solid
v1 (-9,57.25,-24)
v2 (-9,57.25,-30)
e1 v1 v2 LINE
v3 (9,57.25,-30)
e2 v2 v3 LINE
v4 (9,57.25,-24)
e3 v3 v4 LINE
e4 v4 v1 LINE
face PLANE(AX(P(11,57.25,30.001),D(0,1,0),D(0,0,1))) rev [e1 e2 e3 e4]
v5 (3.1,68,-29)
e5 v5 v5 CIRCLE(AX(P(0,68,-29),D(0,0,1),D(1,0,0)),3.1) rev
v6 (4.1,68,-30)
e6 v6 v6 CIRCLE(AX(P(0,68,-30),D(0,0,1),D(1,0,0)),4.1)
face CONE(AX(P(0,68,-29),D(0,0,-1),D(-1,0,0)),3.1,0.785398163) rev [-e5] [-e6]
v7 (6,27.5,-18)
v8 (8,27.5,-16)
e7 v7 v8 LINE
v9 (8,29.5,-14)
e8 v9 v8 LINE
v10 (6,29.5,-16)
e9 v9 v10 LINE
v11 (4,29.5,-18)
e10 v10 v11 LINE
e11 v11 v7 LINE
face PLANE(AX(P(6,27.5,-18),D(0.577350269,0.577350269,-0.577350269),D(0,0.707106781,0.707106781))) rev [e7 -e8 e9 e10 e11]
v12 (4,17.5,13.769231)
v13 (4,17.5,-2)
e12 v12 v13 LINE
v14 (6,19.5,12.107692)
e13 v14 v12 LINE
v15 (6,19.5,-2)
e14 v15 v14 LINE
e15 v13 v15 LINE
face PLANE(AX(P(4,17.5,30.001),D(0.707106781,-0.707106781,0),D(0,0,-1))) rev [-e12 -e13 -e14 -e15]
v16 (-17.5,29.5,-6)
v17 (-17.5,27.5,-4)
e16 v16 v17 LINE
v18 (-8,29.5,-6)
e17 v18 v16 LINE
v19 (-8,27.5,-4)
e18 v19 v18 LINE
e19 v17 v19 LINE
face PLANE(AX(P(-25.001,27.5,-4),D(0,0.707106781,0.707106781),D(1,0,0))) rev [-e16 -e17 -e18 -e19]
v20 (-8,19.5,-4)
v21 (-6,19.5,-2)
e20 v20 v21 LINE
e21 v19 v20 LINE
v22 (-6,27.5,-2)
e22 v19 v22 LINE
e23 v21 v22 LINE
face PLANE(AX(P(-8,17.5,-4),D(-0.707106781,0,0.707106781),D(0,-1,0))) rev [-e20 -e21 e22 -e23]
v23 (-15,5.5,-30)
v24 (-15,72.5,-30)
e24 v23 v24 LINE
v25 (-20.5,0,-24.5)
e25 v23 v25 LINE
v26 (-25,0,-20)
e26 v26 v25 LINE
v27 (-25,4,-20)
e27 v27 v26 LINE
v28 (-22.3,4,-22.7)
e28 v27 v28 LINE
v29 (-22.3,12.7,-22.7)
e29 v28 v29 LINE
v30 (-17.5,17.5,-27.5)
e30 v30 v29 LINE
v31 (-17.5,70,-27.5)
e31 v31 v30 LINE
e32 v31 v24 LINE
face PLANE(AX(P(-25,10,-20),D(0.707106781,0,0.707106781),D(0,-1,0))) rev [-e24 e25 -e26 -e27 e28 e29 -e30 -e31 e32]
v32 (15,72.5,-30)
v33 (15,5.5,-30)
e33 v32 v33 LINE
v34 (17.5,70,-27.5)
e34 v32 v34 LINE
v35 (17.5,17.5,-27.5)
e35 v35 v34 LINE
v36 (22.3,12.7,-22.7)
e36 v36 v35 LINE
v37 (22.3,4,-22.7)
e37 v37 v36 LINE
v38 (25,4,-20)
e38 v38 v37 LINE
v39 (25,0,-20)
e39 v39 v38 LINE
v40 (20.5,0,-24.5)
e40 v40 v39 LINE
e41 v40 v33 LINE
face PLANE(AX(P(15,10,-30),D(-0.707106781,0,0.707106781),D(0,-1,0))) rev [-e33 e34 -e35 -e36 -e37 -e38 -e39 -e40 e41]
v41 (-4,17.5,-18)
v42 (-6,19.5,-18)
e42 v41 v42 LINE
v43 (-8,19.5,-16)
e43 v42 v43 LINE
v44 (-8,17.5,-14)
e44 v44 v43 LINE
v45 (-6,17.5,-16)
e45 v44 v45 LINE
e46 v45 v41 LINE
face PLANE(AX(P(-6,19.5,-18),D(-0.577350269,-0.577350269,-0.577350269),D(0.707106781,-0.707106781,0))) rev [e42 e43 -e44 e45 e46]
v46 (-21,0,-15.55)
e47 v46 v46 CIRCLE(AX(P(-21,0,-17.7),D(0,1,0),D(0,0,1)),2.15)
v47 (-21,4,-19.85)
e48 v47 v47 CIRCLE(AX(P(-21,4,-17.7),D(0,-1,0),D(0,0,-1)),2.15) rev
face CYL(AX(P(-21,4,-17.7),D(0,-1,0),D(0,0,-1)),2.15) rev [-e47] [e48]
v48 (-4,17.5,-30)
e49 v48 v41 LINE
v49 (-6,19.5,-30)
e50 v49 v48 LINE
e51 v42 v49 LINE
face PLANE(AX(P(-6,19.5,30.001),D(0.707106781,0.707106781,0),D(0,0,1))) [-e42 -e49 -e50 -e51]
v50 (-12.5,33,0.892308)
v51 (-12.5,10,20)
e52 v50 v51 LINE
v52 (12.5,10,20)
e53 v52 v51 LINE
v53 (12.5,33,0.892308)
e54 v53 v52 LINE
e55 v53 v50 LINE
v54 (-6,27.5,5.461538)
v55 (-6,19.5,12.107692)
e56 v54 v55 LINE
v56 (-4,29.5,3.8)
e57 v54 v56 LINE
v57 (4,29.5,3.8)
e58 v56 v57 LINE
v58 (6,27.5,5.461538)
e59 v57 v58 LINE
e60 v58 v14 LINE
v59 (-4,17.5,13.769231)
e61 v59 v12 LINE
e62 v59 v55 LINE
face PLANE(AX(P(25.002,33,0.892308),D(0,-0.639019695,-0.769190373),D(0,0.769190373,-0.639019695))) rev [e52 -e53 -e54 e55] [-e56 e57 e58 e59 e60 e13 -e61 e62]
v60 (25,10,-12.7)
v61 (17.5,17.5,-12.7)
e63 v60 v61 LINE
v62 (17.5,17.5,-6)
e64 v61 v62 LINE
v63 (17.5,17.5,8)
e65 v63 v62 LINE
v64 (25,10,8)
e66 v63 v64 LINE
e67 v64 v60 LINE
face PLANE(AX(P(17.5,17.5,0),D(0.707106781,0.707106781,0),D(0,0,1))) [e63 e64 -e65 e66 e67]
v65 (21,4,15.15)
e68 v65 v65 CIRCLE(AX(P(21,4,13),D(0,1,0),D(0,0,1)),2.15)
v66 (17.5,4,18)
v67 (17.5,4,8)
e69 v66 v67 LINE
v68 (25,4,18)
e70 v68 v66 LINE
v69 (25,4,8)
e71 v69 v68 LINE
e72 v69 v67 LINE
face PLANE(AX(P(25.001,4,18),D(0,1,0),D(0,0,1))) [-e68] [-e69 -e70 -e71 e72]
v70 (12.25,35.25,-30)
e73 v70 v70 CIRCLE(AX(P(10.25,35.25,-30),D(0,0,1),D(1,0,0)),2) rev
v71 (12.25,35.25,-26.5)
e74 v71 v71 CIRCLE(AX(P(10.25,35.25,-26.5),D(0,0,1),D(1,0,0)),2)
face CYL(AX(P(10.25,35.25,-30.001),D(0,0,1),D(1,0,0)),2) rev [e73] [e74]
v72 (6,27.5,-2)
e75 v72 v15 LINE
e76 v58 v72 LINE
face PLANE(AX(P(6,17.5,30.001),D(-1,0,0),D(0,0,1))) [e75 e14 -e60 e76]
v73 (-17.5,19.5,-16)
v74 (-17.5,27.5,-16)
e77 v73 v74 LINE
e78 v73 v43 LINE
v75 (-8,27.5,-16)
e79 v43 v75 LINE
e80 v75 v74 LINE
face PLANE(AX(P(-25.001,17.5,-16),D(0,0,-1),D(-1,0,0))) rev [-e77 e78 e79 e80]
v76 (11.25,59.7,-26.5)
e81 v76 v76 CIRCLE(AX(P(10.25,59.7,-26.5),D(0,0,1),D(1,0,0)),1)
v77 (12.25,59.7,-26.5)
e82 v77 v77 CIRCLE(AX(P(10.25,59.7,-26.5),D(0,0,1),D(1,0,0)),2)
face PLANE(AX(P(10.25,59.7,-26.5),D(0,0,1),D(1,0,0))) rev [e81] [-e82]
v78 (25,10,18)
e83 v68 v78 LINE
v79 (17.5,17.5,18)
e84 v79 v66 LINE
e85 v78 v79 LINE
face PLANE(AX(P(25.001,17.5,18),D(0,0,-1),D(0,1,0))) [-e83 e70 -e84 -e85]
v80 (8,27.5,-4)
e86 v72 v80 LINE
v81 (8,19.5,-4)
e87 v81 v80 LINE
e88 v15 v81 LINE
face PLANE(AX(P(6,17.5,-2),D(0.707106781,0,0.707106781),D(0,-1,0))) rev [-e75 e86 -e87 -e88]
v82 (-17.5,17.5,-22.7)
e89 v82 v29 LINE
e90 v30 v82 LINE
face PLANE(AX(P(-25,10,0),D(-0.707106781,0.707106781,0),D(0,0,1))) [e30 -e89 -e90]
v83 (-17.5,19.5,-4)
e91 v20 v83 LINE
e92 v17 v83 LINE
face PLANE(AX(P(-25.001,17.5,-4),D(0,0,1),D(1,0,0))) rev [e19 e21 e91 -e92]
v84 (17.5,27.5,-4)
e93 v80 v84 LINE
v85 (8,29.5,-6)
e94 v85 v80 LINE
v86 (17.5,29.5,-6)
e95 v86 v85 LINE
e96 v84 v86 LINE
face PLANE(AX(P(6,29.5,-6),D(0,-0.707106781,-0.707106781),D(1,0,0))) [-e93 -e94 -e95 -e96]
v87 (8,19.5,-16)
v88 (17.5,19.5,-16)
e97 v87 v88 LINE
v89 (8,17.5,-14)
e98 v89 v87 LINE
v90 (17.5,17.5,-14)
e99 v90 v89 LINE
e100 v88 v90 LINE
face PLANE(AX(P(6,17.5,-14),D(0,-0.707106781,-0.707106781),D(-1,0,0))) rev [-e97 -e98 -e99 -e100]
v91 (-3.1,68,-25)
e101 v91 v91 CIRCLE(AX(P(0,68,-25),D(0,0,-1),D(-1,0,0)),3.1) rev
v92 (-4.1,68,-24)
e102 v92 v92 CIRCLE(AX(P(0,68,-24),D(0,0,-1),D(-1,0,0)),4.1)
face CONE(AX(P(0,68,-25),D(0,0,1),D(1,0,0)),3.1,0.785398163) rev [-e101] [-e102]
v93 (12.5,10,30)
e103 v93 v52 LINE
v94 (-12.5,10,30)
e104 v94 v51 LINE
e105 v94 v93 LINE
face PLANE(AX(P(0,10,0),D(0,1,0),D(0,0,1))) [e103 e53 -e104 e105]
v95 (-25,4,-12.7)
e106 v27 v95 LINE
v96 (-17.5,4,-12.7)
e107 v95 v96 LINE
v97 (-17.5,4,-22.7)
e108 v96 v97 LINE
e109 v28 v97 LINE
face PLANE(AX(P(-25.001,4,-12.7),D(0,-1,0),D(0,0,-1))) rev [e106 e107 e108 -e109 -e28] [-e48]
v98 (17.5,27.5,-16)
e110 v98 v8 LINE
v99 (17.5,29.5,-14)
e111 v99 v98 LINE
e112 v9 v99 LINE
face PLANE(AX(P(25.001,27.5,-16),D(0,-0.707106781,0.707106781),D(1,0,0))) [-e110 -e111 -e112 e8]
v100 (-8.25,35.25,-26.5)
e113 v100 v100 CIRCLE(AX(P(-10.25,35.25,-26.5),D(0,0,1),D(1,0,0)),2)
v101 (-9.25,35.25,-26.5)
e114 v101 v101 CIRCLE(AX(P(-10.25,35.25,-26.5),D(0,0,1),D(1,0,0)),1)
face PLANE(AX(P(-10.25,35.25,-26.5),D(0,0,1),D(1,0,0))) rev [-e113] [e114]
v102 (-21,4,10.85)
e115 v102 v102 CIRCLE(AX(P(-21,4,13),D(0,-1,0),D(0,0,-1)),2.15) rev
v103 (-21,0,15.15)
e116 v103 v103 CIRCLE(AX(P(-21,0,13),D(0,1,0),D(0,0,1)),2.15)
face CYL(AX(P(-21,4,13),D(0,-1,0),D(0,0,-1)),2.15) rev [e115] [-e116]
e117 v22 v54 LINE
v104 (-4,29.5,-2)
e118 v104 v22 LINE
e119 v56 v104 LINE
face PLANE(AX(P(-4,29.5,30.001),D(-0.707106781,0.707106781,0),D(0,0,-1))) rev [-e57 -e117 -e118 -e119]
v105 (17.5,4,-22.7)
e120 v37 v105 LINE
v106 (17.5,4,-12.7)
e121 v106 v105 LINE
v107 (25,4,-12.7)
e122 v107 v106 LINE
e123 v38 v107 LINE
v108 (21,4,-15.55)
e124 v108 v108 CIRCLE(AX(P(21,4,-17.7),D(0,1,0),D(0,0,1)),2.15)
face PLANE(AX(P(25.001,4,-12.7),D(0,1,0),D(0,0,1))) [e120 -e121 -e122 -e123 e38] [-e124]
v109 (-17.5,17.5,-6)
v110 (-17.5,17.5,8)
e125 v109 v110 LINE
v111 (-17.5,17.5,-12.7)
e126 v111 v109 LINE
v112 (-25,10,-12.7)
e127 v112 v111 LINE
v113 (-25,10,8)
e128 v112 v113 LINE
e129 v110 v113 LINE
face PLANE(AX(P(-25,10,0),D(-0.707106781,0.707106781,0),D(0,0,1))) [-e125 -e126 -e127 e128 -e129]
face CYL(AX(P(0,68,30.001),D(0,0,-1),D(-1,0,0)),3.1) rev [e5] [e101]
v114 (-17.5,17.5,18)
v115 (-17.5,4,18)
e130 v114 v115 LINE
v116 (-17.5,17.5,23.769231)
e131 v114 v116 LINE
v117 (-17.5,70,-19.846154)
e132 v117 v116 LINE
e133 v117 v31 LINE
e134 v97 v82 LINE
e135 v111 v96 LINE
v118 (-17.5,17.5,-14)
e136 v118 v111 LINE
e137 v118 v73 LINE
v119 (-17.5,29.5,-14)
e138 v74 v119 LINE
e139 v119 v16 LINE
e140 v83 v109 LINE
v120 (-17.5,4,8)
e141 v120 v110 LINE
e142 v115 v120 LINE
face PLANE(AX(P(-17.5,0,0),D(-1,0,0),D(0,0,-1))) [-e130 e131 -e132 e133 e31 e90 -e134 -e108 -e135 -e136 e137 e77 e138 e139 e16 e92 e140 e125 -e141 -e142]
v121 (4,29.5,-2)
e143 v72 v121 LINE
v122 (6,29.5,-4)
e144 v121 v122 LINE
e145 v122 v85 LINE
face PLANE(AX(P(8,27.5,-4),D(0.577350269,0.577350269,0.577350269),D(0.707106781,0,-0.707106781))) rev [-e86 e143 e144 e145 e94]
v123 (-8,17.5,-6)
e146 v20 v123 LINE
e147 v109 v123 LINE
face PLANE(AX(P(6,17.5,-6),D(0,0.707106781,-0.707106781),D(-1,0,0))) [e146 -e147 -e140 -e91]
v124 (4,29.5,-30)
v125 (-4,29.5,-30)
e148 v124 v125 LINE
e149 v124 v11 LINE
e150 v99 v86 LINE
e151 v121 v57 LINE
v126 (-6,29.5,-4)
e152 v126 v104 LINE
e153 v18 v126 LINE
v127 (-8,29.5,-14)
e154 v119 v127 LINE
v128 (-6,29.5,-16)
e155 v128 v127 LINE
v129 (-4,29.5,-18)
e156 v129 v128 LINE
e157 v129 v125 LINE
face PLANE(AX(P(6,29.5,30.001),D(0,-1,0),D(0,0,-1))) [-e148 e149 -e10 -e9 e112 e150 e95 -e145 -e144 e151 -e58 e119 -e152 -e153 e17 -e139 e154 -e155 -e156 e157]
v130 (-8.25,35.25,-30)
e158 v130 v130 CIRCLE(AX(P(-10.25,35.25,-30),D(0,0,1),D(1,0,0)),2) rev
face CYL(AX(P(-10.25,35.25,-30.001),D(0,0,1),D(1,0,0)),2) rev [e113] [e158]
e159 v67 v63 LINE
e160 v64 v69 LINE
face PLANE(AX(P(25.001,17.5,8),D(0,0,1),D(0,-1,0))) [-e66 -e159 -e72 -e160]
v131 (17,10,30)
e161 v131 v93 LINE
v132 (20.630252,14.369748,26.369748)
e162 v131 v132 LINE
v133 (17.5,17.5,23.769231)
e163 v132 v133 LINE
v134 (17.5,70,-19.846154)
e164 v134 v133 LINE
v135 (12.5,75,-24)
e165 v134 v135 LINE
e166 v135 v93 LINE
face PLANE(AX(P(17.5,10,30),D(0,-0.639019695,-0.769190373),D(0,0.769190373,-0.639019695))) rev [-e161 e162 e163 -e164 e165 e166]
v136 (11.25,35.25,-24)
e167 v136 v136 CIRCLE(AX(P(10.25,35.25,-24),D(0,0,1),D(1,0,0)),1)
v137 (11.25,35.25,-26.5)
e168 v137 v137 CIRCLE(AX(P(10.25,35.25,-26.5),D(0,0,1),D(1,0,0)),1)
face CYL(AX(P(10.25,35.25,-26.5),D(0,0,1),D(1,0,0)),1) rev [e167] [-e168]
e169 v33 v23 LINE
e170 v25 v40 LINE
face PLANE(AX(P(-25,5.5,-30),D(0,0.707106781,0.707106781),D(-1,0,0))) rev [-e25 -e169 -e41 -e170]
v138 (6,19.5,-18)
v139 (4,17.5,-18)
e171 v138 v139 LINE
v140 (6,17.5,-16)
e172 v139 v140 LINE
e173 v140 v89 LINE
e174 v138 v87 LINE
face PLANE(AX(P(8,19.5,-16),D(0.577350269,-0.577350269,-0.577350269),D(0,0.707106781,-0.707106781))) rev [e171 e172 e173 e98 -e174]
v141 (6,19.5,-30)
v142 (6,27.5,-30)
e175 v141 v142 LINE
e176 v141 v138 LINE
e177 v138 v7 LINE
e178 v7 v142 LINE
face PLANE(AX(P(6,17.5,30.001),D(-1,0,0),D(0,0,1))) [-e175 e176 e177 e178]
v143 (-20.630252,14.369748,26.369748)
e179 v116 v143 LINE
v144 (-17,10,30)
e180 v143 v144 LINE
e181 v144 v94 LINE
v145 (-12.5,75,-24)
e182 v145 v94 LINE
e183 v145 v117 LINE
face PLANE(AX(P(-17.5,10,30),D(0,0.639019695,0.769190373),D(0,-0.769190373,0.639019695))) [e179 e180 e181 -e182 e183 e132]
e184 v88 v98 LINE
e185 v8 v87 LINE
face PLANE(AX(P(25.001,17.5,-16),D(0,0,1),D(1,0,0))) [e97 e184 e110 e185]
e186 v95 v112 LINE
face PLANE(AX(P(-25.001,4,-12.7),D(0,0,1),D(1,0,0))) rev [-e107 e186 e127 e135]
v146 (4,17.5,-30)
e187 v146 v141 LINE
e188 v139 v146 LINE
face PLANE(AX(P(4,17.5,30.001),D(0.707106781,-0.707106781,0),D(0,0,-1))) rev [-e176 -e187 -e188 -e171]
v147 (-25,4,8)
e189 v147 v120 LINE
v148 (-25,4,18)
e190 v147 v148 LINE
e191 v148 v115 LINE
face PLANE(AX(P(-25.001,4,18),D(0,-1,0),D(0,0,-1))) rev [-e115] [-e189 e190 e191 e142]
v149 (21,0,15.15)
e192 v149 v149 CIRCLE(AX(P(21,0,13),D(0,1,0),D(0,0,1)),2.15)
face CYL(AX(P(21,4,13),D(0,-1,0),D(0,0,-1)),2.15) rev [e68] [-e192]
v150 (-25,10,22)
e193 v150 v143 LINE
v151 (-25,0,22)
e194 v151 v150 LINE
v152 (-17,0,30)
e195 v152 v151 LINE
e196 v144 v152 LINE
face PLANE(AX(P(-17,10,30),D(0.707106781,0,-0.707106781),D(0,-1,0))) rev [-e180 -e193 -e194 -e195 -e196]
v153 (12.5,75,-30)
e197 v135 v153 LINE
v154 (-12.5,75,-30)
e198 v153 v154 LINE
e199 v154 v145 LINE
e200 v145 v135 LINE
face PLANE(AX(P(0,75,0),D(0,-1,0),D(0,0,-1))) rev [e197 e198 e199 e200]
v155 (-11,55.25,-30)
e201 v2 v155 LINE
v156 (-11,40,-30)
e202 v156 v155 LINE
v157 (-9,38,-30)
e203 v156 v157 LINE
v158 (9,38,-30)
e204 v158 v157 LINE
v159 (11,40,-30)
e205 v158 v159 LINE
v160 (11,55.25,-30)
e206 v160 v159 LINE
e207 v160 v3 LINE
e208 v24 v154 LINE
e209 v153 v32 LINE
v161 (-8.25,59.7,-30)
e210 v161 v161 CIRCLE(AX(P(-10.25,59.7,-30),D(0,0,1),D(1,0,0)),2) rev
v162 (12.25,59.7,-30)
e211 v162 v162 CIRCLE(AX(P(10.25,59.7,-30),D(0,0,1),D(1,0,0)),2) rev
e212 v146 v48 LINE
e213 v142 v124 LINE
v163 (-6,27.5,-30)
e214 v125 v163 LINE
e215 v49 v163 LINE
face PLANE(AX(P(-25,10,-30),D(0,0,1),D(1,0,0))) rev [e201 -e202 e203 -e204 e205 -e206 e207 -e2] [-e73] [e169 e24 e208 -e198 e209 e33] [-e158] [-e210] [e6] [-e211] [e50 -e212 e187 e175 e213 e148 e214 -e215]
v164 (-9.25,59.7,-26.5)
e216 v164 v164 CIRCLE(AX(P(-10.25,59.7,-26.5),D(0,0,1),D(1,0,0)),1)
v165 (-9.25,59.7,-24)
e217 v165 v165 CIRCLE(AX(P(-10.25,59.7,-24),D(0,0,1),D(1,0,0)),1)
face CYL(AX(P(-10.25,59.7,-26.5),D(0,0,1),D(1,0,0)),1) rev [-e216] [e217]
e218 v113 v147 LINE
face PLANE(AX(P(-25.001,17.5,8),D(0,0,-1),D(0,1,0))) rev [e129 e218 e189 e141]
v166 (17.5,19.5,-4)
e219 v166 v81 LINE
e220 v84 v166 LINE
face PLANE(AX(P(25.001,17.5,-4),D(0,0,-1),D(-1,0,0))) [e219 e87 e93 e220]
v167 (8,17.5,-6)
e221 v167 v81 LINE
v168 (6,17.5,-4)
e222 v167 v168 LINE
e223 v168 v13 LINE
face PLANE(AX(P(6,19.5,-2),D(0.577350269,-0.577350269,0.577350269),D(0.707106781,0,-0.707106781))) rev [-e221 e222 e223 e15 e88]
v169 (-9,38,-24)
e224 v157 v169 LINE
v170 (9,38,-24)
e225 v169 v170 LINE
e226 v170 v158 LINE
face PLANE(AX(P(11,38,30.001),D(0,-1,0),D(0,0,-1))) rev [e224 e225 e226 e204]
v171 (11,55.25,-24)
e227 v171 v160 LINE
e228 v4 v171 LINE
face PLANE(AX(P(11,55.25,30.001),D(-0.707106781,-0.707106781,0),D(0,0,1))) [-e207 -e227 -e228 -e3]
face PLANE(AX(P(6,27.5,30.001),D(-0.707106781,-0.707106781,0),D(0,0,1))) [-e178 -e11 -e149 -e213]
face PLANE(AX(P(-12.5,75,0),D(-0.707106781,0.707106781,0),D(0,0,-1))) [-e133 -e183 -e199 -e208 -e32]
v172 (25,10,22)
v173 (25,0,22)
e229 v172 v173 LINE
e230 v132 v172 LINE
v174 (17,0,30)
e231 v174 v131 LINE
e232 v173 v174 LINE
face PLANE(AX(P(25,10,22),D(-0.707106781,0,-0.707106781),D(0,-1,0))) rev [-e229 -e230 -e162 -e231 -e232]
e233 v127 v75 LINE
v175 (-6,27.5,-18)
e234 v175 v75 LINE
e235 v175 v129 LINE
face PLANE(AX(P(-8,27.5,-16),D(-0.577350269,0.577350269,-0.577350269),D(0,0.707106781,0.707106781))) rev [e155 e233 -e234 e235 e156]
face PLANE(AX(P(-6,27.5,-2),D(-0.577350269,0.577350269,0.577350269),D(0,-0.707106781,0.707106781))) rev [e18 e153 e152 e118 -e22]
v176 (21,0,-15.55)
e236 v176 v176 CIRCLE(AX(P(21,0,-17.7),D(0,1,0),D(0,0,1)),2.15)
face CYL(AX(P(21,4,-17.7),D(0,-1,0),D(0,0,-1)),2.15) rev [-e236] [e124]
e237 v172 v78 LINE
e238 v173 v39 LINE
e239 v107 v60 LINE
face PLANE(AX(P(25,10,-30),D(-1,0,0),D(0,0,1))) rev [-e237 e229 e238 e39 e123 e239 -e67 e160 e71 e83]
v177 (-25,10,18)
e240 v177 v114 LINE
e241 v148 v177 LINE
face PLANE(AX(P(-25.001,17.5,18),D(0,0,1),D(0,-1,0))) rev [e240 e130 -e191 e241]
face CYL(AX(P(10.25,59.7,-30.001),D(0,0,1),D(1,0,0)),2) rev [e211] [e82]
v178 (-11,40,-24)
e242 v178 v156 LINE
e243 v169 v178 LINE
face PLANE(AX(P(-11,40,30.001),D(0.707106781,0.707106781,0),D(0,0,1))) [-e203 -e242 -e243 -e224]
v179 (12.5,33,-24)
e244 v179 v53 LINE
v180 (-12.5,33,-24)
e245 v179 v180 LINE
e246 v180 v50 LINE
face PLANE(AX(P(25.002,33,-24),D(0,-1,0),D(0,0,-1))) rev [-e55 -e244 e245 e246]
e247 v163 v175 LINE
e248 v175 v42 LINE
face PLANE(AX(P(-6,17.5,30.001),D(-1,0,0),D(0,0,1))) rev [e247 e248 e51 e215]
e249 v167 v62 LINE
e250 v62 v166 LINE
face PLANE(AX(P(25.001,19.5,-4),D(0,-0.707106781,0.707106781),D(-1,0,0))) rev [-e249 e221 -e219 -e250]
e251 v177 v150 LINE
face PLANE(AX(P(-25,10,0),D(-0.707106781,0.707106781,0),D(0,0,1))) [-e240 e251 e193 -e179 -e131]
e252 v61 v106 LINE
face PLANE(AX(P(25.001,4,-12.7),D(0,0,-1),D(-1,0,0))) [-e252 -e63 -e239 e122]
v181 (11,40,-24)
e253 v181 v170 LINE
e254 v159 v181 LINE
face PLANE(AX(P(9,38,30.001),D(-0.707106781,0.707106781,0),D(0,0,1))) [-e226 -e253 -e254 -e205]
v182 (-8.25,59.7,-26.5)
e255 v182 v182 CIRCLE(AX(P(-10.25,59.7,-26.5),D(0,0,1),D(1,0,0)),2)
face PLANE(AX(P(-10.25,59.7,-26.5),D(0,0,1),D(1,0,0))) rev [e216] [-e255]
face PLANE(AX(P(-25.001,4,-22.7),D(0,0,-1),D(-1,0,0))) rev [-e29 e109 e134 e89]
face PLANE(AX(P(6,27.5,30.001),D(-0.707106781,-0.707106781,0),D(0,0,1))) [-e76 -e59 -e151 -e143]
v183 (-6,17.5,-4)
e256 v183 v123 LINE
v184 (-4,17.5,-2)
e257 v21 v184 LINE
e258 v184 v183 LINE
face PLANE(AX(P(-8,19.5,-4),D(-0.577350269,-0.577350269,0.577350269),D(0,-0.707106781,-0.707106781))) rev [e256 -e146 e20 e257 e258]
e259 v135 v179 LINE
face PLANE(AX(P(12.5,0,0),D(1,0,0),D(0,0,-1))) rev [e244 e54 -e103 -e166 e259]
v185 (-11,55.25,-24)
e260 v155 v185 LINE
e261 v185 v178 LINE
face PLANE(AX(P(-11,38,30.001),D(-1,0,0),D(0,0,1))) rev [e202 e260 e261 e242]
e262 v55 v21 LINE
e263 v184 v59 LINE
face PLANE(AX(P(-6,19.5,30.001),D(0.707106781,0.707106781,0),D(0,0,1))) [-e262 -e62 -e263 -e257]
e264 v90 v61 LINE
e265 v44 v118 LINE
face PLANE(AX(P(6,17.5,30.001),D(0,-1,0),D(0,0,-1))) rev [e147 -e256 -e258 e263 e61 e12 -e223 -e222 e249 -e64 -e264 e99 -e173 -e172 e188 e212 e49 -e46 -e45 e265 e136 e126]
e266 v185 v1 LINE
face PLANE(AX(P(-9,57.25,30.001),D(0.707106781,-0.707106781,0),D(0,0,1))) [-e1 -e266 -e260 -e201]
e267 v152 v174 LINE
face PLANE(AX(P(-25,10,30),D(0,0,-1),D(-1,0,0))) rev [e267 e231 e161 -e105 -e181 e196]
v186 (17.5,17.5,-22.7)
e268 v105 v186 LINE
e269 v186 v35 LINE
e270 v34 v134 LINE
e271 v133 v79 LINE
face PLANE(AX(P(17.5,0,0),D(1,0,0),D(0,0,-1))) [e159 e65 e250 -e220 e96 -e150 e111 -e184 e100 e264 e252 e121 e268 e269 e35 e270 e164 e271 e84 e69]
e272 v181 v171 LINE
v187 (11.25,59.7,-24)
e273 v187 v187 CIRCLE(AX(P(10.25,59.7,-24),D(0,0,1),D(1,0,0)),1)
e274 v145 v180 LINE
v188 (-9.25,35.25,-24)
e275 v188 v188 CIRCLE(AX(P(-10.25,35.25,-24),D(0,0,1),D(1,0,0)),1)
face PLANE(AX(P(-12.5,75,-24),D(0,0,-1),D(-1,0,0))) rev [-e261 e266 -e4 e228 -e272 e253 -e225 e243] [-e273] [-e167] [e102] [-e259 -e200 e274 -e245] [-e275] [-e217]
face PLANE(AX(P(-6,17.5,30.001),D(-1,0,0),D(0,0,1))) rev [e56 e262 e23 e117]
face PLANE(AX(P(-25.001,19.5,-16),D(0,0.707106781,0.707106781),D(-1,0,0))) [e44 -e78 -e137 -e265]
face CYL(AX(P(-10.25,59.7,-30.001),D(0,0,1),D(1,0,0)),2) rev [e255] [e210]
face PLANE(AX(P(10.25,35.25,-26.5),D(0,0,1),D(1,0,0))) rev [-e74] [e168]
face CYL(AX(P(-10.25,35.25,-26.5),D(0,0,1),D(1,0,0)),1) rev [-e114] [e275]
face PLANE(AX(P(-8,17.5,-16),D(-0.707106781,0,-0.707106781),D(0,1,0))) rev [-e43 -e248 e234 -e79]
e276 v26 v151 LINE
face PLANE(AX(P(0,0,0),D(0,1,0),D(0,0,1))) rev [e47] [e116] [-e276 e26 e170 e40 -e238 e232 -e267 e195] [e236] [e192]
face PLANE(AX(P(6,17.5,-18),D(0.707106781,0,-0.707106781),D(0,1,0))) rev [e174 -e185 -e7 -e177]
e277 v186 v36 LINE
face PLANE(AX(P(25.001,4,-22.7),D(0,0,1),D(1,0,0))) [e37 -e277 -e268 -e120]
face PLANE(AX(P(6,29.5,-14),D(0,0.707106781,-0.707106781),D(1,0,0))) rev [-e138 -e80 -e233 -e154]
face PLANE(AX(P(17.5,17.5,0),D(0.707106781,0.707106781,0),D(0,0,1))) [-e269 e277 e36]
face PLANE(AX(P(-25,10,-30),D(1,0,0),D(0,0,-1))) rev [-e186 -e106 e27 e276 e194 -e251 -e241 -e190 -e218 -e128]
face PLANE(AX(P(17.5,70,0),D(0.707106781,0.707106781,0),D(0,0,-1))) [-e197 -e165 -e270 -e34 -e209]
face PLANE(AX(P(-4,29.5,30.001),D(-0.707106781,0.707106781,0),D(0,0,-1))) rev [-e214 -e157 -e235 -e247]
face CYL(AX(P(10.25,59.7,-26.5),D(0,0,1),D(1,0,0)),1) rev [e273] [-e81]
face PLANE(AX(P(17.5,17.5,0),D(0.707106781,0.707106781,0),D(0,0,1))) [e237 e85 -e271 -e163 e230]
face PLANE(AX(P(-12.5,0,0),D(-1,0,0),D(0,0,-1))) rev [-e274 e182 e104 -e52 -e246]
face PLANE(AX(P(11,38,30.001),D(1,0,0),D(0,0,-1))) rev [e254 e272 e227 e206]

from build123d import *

# Parameters (mm, degrees)
SKETCH1_W           = 50
SKETCH1_H           = 60
BOSS_EXTRUDE1_DEPTH = 10
SKETCH2_R           = 2.15
CUT_EXTRUDE1_DEPTH  = 4
SKETCH5_W           = 25
SKETCH5_H           = 6
BOSS_EXTRUDE3_DEPTH = 65
CUT_EXTRUDE3_REACH  = 101.247
SKETCH6_W           = 22
SKETCH6_H           = 19.25
SKETCH7_R           = 1
CUT_EXTRUDE4_DEPTH  = 2.5
CUT_EXTRUDE5_REACH  = 99.171
SKETCH8_R           = 2
BOSS_EXTRUDE4_DEPTH = 5
CHAMFER1_SIZE       = 7.5
CHAMFER2_SIZE       = 10
CHAMFER4_SIZE       = 5.5
CHAMFER5_SIZE       = 5
CHAMFER7_SIZE       = 2
CUT_EXTRUDE6_REACH  = 101.247
SKETCH10_R          = 3.1
CHAMFER8_SIZE       = 1
BOSS_EXTRUDE5_REACH = 91.058
CHAMFER9_SIZE       = 8
CUT_EXTRUDE7_REACH  = 101.247
SKETCH12_W          = 12
SKETCH12_H          = 12
CUT_EXTRUDE9_REACH  = 88.522
SKETCH14_W          = 12
SKETCH14_H          = 12
CHAMFER11_SIZE      = 2
CUT_EXTRUDE11_REACH = 93.276
SKETCH16_W          = 10
SKETCH16_H          = 13.5
SKETCH17_W          = 10
SKETCH17_H          = 13.5
CUT_EXTRUDE12_DEPTH = 7.5


# Some blends are built 0.0001 mm under size
with BuildPart() as part:
    # Sketch1 → Boss-Extrude1 (new body)
    with BuildSketch(Plane(origin=(0, 0, 0), x_dir=(1, 0, 0), z_dir=(0, 1, 0))):
        Rectangle(SKETCH1_W, SKETCH1_H)
    extrude(amount=BOSS_EXTRUDE1_DEPTH)

    # Sketch2 → Cut-Extrude1 (cut)
    with BuildSketch(Plane(origin=(0, 0, 0), x_dir=(1, 0, 0), z_dir=(0, 1, 0))):
        with Locations(Location((-21, 17.7, 0), (0, 0, 270))):
            Circle(SKETCH2_R)
        with Locations(Location((-21, -13, 0), (0, 0, 270))):
            Circle(SKETCH2_R)
        with Locations(Location((21, 17.7, 0), (0, 0, 270))):
            Circle(SKETCH2_R)
        with Locations(Location((21, -13, 0), (0, 0, 270))):
            Circle(SKETCH2_R)
    extrude(amount=CUT_EXTRUDE1_DEPTH, mode=Mode.SUBTRACT)

    # Sketch5 → Boss-Extrude3 (add)
    with BuildSketch(Plane(origin=(0, 10, 0), x_dir=(1, 0, 0), z_dir=(0, 1, 0))):
        with Locations((0, 27)):
            Rectangle(SKETCH5_W, SKETCH5_H)
    extrude(amount=BOSS_EXTRUDE3_DEPTH)

    # Sketch6 → Cut-Extrude3 (cut, up to next)
    with BuildSketch(Plane(origin=(0, 0, -30), x_dir=(-1, 0, 0), z_dir=(0, 0, -1)), mode=Mode.PRIVATE) as cut_extrude3_sk1:
        with Locations((0, 47.625)):
            Rectangle(SKETCH6_W, SKETCH6_H)
    cut_extrude3_tool1 = extrude(cut_extrude3_sk1.sketch, amount=-CUT_EXTRUDE3_REACH, mode=Mode.PRIVATE) & part.part
    add(cut_extrude3_tool1.solids().sort_by_distance((0, 47.625, -30))[0], mode=Mode.SUBTRACT)

    # Sketch7 → Cut-Extrude4 (cut)
    with BuildSketch(Plane.XY.offset(-24)):
        with Locations((10.25, 35.25)):
            Circle(SKETCH7_R)
        with Locations((-10.25, 35.25)):
            Circle(SKETCH7_R)
        with Locations((-10.25, 59.7)):
            Circle(SKETCH7_R)
        with Locations((10.25, 59.7)):
            Circle(SKETCH7_R)
    extrude(amount=-CUT_EXTRUDE4_DEPTH, mode=Mode.SUBTRACT)

    # Sketch8 → Cut-Extrude5 (cut, up to next)
    with BuildSketch(Plane.XY.offset(-26.5), mode=Mode.PRIVATE) as cut_extrude5_sk1:
        with Locations((-10.25, 59.7)):
            Circle(SKETCH8_R)
    cut_extrude5_tool1 = extrude(cut_extrude5_sk1.sketch, amount=-CUT_EXTRUDE5_REACH, mode=Mode.PRIVATE) & part.part
    # Sketch8 → Cut-Extrude5 (cut, up to next)
    with BuildSketch(Plane.XY.offset(-26.5), mode=Mode.PRIVATE) as cut_extrude5_sk2:
        with Locations((10.25, 59.7)):
            Circle(SKETCH8_R)
    cut_extrude5_tool2 = extrude(cut_extrude5_sk2.sketch, amount=-CUT_EXTRUDE5_REACH, mode=Mode.PRIVATE) & part.part
    # Sketch8 → Cut-Extrude5 (cut, up to next)
    with BuildSketch(Plane.XY.offset(-26.5), mode=Mode.PRIVATE) as cut_extrude5_sk3:
        with Locations((10.25, 35.25)):
            Circle(SKETCH8_R)
    cut_extrude5_tool3 = extrude(cut_extrude5_sk3.sketch, amount=-CUT_EXTRUDE5_REACH, mode=Mode.PRIVATE) & part.part
    # Sketch8 → Cut-Extrude5 (cut, up to next)
    with BuildSketch(Plane.XY.offset(-26.5), mode=Mode.PRIVATE) as cut_extrude5_sk4:
        with Locations((-10.25, 35.25)):
            Circle(SKETCH8_R)
    cut_extrude5_tool4 = extrude(cut_extrude5_sk4.sketch, amount=-CUT_EXTRUDE5_REACH, mode=Mode.PRIVATE) & part.part
    add(cut_extrude5_tool1.solids().sort_by_distance((-10.25, 59.7, -26.5))[0], mode=Mode.SUBTRACT)
    add(cut_extrude5_tool2.solids().sort_by_distance((10.25, 59.7, -26.5))[0], mode=Mode.SUBTRACT)
    add(cut_extrude5_tool3.solids().sort_by_distance((10.25, 35.25, -26.5))[0], mode=Mode.SUBTRACT)
    add(cut_extrude5_tool4.solids().sort_by_distance((-10.25, 35.25, -26.5))[0], mode=Mode.SUBTRACT)

    # Sketch9 → Boss-Extrude4 (add)
    with BuildSketch(Plane(origin=(12.5, 0, 0), x_dir=(0, 0, -1), z_dir=(1, 0, 0))):
        Polygon((30, 75), (24, 75), (-30, 10), (30, 10), align=None)
    boss_extrude4 = extrude(amount=BOSS_EXTRUDE4_DEPTH)

    # Mirror1: Boss-Extrude4 across plane
    add(boss_extrude4.mirror(Plane(origin=(0, 0, 0), x_dir=(0, 0, 1), z_dir=(1, 0, 0))))

    # Chamfer1
    chamfer1_edges = [part.edges().sort_by_distance(p)[0] for p in [
        (17.5, 10, 0),
        (-17.5, 10, 0),
    ]]
    chamfer(chamfer1_edges, length=CHAMFER1_SIZE - 0.0001)  # a hair under: the kernel refuses the full size

    # Chamfer2
    chamfer2_edges = [part.edges().sort_by_distance(p)[0] for p in [
        (-25, 5, -30),
        (25, 5, -30),
    ]]
    chamfer(chamfer2_edges, length=CHAMFER2_SIZE)

    # Chamfer4
    chamfer4_edges = [part.edges().sort_by_distance(p)[0] for p in [
        (0, 0, -30),
    ]]
    chamfer(chamfer4_edges, length=CHAMFER4_SIZE)

    # Chamfer5
    chamfer5_edges = [part.edges().sort_by_distance(p)[0] for p in [
        (17.5, 75, -25.75),
        (-17.5, 75, -25.75),
    ]]
    chamfer(chamfer5_edges, length=CHAMFER5_SIZE)

    # Chamfer7
    chamfer7_edges = [part.edges().sort_by_distance(p)[0] for p in [
        (-11, 57.25, -27),
        (-11, 38, -27),
        (11, 38, -27),
        (11, 57.25, -27),
    ]]
    chamfer(chamfer7_edges, length=CHAMFER7_SIZE)

    # Sketch10 → Cut-Extrude6 (cut, up to next)
    with BuildSketch(Plane(origin=(0, 0, -30), x_dir=(-1, 0, 0), z_dir=(0, 0, -1)), mode=Mode.PRIVATE) as cut_extrude6_sk1:
        with Locations((0, 68)):
            Circle(SKETCH10_R)
    cut_extrude6_tool1 = extrude(cut_extrude6_sk1.sketch, amount=-CUT_EXTRUDE6_REACH, mode=Mode.PRIVATE) & part.part
    add(cut_extrude6_tool1.solids().sort_by_distance((0, 68, -30))[0], mode=Mode.SUBTRACT)

    # Chamfer8
    chamfer8_edges = [part.edges().sort_by_distance(p)[0] for p in [
        (3.1, 68, -30),
        (3.1, 68, -24),
    ]]
    chamfer(chamfer8_edges, length=CHAMFER8_SIZE)

    # Sketch11 → Boss-Extrude5 (add, up to next)
    with BuildSketch(Plane(origin=(-12.5, 0, 0), x_dir=(0, 0, -1), z_dir=(1, 0, 0)), mode=Mode.PRIVATE) as boss_extrude5_sk1:
        Polygon((-20, 10), (24, 10), (24, 33), (-0.892307692, 33), align=None)
    boss_extrude5_tool1 = extrude(boss_extrude5_sk1.sketch, amount=BOSS_EXTRUDE5_REACH, mode=Mode.PRIVATE) - part.part
    add(boss_extrude5_tool1.solids().sort_by_distance((-12.5, 20.436802, -6.335287))[0])

    # Chamfer9
    # the kernel refuses this chamfer: 8 mm, written as the material it takes off along each edge
    with BuildSketch(Plane(origin=(25, -20.573463904, 30), x_dir=(0.027495876610586487, 0, -0.9996219169112968), z_dir=(0, 1, 0))) as chamfer9_piece_1:
        Polygon((CHAMFER9_SIZE * 0.999621916911, CHAMFER9_SIZE * 0.0274958766106), (-CHAMFER9_SIZE * 0.0274958766106, CHAMFER9_SIZE * 0.999621916911), (0, 0), align=None)
    extrude(amount=51.146927807, mode=Mode.SUBTRACT)
    with BuildSketch(Plane(origin=(-25, -20.573463904, 30), x_dir=(-0.027495876610586487, 0, -0.9996219169112968), z_dir=(0, 1, 0))) as chamfer9_piece_2:
        Polygon((CHAMFER9_SIZE * 0.999621916911, -CHAMFER9_SIZE * 0.0274958766106), (-CHAMFER9_SIZE * 0.0274958766106, -CHAMFER9_SIZE * 0.999621916911), (0, 0), align=None)
    extrude(amount=51.146927807, mode=Mode.SUBTRACT)

    # Cut-Extrude7: up to this plane
    cut_extrude7_end = Plane(origin=(25.002, 33, 0.892307692), z_dir=(0, -0.6390196945354668, -0.7691903730519506))
    # Sketch12 → Cut-Extrude7 (cut, up to the surface)
    with BuildSketch(Plane(origin=(0, 0, -30), x_dir=(-1, 0, 0), z_dir=(0, 0, -1)), mode=Mode.PRIVATE) as cut_extrude7_sk1:
        with Locations((0, 23.5)):
            Rectangle(SKETCH12_W, SKETCH12_H)
    cut_extrude7_tool1 = split(extrude(cut_extrude7_sk1.sketch, amount=-CUT_EXTRUDE7_REACH, mode=Mode.PRIVATE), bisect_by=cut_extrude7_end, keep=Keep.BOTH, mode=Mode.PRIVATE)
    add(cut_extrude7_tool1.solids().sort_by_distance((0, 23.5, -30))[0], mode=Mode.SUBTRACT)

    # Sketch14 → Cut-Extrude9 (cut, up to next)
    with BuildSketch(Plane(origin=(-6, 0, 0), x_dir=(0, 0, -1), z_dir=(1, 0, 0)), mode=Mode.PRIVATE) as cut_extrude9_sk1:
        with Locations((10, 23.5)):
            Rectangle(SKETCH14_W, SKETCH14_H)
    cut_extrude9_tool1 = extrude(cut_extrude9_sk1.sketch, amount=-CUT_EXTRUDE9_REACH, mode=Mode.PRIVATE) & part.part
    cut_extrude9 = cut_extrude9_tool1.solids().sort_by_distance((-6, 23.5, -10))[0]
    add(cut_extrude9, mode=Mode.SUBTRACT)

    # Mirror2: Cut-Extrude9 across plane
    add(cut_extrude9.mirror(Plane(origin=(0, 0, 0), x_dir=(0, 0, 1), z_dir=(1, 0, 0))), mode=Mode.SUBTRACT)

    # Chamfer11
    chamfer11_edges = [part.edges().sort_by_distance(p)[0] for p in [
        (-6, 17.5, 4.884615385),
        (6, 17.5, 4.884615385),
        (6, 29.5, -0.1),
        (-6, 29.5, -0.1),
        (-6, 17.5, -23),
        (-6, 29.5, -23),
        (-11.75, 17.5, -16),
        (-11.75, 29.5, -16),
        (-11.75, 17.5, -4),
        (-11.75, 29.5, -4),
        (-6, 23.5, -16),
        (-6, 23.5, -4),
        (6, 29.5, -23),
        (6, 17.5, -23),
        (11.75, 17.5, -4),
        (11.75, 17.5, -16),
        (6, 23.5, -16),
        (11.75, 29.5, -16),
        (11.75, 29.5, -4),
        (6, 23.5, -4),
    ]]
    chamfer(chamfer11_edges, length=CHAMFER11_SIZE)

    # Sketch16 → Cut-Extrude11 (cut, up to next)
    with BuildSketch(Plane(origin=(17.5, 0, 0), x_dir=(0, 0, -1), z_dir=(1, 0, 0)), mode=Mode.PRIVATE) as cut_extrude11_sk1:
        with Locations((-13, 10.75)):
            Rectangle(SKETCH16_W, SKETCH16_H)
    cut_extrude11_tool1 = extrude(cut_extrude11_sk1.sketch, amount=CUT_EXTRUDE11_REACH, mode=Mode.PRIVATE) & part.part
    cut_extrude11 = cut_extrude11_tool1.solids().sort_by_distance((17.5, 10.75, 13))[0]
    add(cut_extrude11, mode=Mode.SUBTRACT)

    # Sketch17 → Cut-Extrude12 (cut)
    with BuildSketch(Plane(origin=(17.5, 0, 0), x_dir=(0, 0, -1), z_dir=(1, 0, 0))):
        with Locations((17.7, 10.75)):
            Rectangle(SKETCH17_W, SKETCH17_H)
    cut_extrude12 = extrude(amount=CUT_EXTRUDE12_DEPTH, mode=Mode.SUBTRACT)

    # Mirror4: Cut-Extrude11, Cut-Extrude12 across plane
    add(cut_extrude11.mirror(Plane(origin=(0, 0, 0), x_dir=(0, 0, 1), z_dir=(1, 0, 0))), mode=Mode.SUBTRACT)
    add(cut_extrude12.mirror(Plane(origin=(0, 0, 0), x_dir=(0, 0, 1), z_dir=(1, 0, 0))), mode=Mode.SUBTRACT)


solid = part.part
